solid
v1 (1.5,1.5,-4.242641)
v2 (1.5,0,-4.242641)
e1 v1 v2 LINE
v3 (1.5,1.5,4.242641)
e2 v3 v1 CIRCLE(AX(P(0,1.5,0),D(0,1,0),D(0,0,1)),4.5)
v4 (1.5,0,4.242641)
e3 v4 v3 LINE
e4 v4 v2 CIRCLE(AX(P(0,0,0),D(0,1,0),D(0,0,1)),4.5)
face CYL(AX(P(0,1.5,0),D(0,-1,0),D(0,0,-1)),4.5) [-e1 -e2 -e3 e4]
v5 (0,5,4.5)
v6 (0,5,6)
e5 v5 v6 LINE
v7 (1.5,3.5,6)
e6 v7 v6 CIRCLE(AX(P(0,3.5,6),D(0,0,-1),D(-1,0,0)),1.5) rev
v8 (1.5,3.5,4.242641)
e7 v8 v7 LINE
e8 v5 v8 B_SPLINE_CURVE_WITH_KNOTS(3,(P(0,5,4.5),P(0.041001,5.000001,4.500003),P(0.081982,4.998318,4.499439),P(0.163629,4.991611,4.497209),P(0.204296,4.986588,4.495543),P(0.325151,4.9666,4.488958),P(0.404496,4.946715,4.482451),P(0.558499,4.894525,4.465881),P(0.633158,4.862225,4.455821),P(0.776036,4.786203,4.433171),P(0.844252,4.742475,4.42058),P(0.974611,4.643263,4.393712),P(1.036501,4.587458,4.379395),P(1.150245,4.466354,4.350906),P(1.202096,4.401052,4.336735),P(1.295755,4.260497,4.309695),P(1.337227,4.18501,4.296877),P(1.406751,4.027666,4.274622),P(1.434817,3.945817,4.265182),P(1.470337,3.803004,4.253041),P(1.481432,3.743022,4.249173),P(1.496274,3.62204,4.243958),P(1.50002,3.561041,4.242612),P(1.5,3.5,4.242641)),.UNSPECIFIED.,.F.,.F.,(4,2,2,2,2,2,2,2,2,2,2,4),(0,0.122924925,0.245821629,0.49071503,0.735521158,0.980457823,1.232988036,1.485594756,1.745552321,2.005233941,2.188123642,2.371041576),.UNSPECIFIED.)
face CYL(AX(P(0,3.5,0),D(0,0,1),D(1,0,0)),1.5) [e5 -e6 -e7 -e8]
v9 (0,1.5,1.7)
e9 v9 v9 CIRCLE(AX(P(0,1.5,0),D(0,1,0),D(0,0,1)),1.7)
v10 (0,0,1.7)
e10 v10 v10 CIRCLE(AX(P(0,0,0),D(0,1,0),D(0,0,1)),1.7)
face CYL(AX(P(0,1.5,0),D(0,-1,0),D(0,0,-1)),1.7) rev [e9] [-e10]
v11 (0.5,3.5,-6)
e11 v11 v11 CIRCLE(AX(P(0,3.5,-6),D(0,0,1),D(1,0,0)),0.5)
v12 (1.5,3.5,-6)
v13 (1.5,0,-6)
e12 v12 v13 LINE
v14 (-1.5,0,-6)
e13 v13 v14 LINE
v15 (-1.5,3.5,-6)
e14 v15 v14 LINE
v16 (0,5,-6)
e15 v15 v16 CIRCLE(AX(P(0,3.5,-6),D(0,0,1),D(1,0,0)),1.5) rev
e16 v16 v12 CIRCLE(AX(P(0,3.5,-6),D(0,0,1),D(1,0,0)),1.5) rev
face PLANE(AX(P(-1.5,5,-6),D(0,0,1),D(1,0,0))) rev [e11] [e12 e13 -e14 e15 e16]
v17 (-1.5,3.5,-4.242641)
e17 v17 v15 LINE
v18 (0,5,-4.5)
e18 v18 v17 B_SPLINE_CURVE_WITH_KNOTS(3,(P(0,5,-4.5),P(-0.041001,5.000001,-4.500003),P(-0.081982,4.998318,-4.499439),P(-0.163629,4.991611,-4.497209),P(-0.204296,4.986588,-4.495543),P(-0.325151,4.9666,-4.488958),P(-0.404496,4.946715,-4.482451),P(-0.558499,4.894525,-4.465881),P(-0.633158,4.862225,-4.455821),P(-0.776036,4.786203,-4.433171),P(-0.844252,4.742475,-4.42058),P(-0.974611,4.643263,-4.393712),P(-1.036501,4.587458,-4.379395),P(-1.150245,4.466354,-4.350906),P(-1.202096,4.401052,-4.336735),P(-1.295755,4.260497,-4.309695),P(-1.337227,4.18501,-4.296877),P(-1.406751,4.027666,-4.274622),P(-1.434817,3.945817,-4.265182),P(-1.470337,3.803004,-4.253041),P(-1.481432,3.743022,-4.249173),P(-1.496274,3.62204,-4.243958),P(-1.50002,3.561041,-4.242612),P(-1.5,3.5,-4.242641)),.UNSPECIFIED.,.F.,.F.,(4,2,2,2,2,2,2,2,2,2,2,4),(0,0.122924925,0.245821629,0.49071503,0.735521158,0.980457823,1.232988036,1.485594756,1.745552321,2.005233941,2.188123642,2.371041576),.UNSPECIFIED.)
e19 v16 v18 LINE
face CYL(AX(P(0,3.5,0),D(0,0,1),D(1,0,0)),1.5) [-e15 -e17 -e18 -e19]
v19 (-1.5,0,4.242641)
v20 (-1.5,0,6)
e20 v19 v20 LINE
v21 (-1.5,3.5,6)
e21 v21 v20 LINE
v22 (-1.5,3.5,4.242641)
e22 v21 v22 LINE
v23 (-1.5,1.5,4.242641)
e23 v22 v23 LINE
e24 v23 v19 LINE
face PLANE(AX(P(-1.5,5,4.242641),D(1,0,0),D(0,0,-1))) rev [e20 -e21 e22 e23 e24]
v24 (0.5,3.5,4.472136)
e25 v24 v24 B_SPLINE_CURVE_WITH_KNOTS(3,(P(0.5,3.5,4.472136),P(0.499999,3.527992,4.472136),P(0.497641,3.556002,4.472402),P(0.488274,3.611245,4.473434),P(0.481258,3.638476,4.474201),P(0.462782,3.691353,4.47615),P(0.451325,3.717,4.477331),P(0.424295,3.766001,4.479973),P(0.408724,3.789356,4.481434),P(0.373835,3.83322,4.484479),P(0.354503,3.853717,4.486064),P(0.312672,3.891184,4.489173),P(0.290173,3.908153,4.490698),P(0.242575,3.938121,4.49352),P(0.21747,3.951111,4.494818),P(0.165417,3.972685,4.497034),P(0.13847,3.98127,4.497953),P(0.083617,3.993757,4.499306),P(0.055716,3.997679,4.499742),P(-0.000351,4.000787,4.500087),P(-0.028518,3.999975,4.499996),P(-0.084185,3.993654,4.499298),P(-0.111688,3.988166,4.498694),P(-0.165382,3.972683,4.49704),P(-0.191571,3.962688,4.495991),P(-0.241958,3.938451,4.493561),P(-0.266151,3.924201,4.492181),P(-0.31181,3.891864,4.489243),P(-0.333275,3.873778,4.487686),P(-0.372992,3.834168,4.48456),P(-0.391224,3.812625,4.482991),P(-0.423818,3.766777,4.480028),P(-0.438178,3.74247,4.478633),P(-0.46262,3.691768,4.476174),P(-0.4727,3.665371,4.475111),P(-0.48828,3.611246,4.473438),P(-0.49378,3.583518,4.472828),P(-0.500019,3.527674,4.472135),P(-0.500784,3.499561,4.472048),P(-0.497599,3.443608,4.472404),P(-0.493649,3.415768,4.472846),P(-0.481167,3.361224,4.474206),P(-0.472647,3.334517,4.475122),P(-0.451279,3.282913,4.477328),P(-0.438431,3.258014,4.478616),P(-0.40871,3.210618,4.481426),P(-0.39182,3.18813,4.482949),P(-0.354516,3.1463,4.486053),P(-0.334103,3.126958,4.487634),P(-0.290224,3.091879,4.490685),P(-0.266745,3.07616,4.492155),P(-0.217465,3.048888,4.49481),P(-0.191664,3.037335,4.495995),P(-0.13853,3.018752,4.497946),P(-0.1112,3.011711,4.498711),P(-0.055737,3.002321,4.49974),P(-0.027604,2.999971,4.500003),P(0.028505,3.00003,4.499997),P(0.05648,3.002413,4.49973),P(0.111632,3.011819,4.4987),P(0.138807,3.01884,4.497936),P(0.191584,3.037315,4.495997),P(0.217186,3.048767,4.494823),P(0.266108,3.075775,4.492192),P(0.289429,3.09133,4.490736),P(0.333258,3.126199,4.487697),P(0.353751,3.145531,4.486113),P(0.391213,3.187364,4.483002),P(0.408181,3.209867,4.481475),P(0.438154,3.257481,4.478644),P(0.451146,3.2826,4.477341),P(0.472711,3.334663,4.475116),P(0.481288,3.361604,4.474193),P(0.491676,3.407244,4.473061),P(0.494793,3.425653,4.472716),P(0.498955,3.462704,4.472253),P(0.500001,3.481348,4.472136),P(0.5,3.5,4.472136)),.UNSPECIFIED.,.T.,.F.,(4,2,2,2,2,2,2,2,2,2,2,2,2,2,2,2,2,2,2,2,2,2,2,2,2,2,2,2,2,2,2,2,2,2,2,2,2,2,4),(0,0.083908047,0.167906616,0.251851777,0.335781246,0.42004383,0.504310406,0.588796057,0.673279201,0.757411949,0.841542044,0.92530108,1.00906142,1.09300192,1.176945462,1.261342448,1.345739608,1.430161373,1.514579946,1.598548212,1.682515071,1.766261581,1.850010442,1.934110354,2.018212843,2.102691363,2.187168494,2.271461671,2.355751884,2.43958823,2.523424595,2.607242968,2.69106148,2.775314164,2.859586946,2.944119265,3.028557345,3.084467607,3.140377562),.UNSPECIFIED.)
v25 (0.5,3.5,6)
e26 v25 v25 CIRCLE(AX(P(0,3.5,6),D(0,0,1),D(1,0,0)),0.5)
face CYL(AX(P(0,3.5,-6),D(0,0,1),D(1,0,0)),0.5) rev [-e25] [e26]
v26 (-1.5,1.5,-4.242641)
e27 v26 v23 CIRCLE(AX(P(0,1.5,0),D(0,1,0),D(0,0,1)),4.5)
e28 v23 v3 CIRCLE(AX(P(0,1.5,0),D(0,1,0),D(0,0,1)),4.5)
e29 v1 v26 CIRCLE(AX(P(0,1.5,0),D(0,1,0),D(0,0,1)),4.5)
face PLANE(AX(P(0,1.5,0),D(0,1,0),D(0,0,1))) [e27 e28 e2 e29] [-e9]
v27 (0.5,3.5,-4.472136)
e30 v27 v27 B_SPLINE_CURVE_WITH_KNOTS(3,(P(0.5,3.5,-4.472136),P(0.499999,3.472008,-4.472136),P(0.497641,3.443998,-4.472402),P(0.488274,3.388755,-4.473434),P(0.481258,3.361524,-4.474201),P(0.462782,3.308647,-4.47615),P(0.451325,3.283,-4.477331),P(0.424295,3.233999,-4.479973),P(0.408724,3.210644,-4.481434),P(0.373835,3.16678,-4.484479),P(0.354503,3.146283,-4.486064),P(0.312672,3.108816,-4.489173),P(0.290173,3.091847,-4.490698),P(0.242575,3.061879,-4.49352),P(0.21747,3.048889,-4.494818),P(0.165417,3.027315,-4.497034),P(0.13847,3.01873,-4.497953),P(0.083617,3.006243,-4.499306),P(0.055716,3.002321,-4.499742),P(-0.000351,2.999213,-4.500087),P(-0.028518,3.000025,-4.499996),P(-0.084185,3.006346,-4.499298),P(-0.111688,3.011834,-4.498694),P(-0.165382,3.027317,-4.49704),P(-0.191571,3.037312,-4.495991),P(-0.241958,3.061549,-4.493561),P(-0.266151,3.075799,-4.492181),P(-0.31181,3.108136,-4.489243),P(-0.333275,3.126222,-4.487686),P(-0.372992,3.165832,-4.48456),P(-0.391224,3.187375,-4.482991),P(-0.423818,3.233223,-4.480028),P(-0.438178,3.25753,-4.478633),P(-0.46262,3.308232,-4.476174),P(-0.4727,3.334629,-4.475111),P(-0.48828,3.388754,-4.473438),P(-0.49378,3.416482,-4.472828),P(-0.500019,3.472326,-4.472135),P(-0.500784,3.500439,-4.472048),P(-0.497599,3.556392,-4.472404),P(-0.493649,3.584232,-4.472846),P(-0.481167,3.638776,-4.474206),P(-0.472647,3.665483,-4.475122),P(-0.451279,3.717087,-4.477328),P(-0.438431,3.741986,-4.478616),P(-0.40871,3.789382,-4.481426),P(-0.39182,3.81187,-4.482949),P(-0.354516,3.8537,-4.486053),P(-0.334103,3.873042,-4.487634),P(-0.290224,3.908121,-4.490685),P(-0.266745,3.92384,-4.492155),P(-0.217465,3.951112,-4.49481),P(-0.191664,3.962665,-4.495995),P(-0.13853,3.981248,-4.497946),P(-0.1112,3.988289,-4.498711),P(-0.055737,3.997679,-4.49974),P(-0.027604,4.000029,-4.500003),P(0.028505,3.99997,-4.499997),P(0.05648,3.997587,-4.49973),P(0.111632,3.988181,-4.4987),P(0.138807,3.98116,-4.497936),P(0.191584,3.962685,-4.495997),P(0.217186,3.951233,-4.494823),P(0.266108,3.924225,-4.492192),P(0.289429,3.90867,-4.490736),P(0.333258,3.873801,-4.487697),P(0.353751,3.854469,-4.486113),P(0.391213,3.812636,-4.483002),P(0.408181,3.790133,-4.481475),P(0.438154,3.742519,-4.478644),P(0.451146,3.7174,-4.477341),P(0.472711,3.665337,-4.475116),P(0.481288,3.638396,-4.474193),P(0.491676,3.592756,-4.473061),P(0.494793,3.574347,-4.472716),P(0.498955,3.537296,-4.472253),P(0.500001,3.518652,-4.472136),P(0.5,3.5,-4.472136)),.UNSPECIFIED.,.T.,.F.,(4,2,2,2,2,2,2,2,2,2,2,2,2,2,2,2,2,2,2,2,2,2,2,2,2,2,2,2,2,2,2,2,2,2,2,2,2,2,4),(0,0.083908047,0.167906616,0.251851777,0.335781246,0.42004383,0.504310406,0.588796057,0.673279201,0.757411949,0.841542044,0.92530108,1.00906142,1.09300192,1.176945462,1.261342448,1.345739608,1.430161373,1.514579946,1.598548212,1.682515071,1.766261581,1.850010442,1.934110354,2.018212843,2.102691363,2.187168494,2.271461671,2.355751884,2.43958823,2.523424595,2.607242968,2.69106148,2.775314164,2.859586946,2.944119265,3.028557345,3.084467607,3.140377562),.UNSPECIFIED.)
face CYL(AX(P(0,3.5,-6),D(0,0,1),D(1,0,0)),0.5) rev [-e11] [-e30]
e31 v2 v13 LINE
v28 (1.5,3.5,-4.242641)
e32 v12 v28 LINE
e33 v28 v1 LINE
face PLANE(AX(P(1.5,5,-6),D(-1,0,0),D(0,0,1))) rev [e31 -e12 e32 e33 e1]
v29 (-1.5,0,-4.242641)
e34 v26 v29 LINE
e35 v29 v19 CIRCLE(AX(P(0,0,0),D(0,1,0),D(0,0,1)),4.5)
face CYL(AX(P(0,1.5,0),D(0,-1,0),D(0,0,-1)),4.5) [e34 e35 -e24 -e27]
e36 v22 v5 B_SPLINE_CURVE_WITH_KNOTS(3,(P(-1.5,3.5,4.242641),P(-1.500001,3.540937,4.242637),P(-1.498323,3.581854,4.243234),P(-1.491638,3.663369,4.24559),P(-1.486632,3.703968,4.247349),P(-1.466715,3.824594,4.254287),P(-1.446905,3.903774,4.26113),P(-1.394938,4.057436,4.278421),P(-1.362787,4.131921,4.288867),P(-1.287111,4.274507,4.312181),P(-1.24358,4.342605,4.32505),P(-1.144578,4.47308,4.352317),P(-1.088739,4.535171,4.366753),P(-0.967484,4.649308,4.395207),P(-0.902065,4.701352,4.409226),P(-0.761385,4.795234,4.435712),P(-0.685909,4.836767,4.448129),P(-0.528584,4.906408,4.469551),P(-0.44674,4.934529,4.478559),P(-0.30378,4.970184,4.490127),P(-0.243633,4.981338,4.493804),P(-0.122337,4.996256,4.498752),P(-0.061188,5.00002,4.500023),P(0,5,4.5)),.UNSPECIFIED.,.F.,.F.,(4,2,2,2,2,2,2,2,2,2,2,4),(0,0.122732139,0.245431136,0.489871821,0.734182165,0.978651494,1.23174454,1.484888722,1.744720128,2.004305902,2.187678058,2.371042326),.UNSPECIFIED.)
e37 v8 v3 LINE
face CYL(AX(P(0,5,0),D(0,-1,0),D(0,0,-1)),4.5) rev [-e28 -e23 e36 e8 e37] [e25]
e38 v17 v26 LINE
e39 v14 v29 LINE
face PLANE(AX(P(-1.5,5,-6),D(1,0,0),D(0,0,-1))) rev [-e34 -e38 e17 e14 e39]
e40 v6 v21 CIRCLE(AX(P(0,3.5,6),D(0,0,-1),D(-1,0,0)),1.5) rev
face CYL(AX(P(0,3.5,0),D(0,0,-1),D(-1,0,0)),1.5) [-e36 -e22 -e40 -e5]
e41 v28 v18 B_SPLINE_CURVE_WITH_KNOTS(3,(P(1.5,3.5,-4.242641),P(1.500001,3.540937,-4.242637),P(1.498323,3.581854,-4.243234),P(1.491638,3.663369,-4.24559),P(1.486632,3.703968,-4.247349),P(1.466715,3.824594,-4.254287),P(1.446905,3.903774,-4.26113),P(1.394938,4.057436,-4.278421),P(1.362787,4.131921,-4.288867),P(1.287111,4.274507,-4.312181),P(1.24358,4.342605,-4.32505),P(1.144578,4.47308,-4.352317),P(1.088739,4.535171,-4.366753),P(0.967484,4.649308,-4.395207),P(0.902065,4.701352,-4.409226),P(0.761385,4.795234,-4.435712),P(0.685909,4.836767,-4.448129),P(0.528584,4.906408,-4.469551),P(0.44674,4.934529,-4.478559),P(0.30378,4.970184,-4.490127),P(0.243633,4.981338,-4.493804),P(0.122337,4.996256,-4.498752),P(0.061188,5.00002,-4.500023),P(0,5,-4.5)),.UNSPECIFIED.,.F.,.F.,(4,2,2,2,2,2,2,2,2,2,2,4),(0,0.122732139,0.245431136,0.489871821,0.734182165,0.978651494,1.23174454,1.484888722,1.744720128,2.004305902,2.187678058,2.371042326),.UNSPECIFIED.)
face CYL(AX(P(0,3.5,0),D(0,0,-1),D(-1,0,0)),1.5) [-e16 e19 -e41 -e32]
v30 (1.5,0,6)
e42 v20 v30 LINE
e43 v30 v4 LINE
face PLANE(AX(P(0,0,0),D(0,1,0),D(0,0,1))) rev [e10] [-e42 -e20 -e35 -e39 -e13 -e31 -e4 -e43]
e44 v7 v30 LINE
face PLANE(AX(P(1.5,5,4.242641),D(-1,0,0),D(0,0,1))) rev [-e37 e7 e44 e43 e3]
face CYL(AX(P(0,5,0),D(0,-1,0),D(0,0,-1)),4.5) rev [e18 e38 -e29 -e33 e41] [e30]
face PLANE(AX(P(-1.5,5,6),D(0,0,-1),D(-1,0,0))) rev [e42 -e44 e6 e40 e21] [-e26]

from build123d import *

# Parameters (mm, degrees)
SKETCH1_R           = 4.5
SKETCH1_R_2         = 1.7
BOSS_EXTRUDE1_DEPTH = 1.5
BOSS_EXTRUDE2_DEPTH = 5
SKETCH4_R           = 0.5
CUT_EXTRUDE1_DEPTH  = 14.756816492
FILLET1_R           = 1.5


with BuildPart() as part:
    # Sketch1 → Boss-Extrude1 (new body)
    with BuildSketch(Plane(origin=(0, 0, 0), x_dir=(1, 0, 0), z_dir=(0, 1, 0))):
        with Locations(Location((0, 0, 0), (0, 0, 270))):
            Circle(SKETCH1_R)
        with Locations(Location((0, 0, 0), (0, 0, 270))):
            Circle(SKETCH1_R_2, mode=Mode.SUBTRACT)
    extrude(amount=BOSS_EXTRUDE1_DEPTH)

    # Sketch3 → Boss-Extrude2 (add)
    with BuildSketch(Plane(origin=(0, 0, 0), x_dir=(1, 0, 0), z_dir=(0, 1, 0))):
        with BuildLine():
            Line((-1.5, -4.242640687), (-1.5, -6))
            Line((-1.5, -6), (1.5, -6))
            Line((1.5, -6), (1.5, -4.242640687))
            ThreePointArc((1.5, -4.242640687), (0, -4.5), (-1.5, -4.242640687))
        make_face()
        with BuildLine():
            Line((-1.5, 6), (1.5, 6))
            Line((1.5, 6), (1.5, 4.242640687))
            ThreePointArc((1.5, 4.242640687), (0, 4.5), (-1.5, 4.242640687))
            Line((-1.5, 4.242640687), (-1.5, 6))
        make_face()
    extrude(amount=BOSS_EXTRUDE2_DEPTH)

    # Sketch4 → Cut-Extrude1 (cut, through all)
    with BuildSketch(Plane.XY.offset(6)):
        with Locations((0, 3.5)):
            Circle(SKETCH4_R)
    extrude(amount=-CUT_EXTRUDE1_DEPTH, mode=Mode.SUBTRACT)

    # Fillet1
    fillet1_edges = [part.edges().sort_by_distance(p)[0] for p in [
        (1.5, 5, 5.121320344),
        (-1.5, 5, 5.121320344),
        (1.5, 5, -5.121320344),
        (-1.5, 5, -5.121320344),
    ]]
    fillet(fillet1_edges, radius=FILLET1_R - 0.0001)  # a hair under: the kernel refuses the full size


solid = part.part
